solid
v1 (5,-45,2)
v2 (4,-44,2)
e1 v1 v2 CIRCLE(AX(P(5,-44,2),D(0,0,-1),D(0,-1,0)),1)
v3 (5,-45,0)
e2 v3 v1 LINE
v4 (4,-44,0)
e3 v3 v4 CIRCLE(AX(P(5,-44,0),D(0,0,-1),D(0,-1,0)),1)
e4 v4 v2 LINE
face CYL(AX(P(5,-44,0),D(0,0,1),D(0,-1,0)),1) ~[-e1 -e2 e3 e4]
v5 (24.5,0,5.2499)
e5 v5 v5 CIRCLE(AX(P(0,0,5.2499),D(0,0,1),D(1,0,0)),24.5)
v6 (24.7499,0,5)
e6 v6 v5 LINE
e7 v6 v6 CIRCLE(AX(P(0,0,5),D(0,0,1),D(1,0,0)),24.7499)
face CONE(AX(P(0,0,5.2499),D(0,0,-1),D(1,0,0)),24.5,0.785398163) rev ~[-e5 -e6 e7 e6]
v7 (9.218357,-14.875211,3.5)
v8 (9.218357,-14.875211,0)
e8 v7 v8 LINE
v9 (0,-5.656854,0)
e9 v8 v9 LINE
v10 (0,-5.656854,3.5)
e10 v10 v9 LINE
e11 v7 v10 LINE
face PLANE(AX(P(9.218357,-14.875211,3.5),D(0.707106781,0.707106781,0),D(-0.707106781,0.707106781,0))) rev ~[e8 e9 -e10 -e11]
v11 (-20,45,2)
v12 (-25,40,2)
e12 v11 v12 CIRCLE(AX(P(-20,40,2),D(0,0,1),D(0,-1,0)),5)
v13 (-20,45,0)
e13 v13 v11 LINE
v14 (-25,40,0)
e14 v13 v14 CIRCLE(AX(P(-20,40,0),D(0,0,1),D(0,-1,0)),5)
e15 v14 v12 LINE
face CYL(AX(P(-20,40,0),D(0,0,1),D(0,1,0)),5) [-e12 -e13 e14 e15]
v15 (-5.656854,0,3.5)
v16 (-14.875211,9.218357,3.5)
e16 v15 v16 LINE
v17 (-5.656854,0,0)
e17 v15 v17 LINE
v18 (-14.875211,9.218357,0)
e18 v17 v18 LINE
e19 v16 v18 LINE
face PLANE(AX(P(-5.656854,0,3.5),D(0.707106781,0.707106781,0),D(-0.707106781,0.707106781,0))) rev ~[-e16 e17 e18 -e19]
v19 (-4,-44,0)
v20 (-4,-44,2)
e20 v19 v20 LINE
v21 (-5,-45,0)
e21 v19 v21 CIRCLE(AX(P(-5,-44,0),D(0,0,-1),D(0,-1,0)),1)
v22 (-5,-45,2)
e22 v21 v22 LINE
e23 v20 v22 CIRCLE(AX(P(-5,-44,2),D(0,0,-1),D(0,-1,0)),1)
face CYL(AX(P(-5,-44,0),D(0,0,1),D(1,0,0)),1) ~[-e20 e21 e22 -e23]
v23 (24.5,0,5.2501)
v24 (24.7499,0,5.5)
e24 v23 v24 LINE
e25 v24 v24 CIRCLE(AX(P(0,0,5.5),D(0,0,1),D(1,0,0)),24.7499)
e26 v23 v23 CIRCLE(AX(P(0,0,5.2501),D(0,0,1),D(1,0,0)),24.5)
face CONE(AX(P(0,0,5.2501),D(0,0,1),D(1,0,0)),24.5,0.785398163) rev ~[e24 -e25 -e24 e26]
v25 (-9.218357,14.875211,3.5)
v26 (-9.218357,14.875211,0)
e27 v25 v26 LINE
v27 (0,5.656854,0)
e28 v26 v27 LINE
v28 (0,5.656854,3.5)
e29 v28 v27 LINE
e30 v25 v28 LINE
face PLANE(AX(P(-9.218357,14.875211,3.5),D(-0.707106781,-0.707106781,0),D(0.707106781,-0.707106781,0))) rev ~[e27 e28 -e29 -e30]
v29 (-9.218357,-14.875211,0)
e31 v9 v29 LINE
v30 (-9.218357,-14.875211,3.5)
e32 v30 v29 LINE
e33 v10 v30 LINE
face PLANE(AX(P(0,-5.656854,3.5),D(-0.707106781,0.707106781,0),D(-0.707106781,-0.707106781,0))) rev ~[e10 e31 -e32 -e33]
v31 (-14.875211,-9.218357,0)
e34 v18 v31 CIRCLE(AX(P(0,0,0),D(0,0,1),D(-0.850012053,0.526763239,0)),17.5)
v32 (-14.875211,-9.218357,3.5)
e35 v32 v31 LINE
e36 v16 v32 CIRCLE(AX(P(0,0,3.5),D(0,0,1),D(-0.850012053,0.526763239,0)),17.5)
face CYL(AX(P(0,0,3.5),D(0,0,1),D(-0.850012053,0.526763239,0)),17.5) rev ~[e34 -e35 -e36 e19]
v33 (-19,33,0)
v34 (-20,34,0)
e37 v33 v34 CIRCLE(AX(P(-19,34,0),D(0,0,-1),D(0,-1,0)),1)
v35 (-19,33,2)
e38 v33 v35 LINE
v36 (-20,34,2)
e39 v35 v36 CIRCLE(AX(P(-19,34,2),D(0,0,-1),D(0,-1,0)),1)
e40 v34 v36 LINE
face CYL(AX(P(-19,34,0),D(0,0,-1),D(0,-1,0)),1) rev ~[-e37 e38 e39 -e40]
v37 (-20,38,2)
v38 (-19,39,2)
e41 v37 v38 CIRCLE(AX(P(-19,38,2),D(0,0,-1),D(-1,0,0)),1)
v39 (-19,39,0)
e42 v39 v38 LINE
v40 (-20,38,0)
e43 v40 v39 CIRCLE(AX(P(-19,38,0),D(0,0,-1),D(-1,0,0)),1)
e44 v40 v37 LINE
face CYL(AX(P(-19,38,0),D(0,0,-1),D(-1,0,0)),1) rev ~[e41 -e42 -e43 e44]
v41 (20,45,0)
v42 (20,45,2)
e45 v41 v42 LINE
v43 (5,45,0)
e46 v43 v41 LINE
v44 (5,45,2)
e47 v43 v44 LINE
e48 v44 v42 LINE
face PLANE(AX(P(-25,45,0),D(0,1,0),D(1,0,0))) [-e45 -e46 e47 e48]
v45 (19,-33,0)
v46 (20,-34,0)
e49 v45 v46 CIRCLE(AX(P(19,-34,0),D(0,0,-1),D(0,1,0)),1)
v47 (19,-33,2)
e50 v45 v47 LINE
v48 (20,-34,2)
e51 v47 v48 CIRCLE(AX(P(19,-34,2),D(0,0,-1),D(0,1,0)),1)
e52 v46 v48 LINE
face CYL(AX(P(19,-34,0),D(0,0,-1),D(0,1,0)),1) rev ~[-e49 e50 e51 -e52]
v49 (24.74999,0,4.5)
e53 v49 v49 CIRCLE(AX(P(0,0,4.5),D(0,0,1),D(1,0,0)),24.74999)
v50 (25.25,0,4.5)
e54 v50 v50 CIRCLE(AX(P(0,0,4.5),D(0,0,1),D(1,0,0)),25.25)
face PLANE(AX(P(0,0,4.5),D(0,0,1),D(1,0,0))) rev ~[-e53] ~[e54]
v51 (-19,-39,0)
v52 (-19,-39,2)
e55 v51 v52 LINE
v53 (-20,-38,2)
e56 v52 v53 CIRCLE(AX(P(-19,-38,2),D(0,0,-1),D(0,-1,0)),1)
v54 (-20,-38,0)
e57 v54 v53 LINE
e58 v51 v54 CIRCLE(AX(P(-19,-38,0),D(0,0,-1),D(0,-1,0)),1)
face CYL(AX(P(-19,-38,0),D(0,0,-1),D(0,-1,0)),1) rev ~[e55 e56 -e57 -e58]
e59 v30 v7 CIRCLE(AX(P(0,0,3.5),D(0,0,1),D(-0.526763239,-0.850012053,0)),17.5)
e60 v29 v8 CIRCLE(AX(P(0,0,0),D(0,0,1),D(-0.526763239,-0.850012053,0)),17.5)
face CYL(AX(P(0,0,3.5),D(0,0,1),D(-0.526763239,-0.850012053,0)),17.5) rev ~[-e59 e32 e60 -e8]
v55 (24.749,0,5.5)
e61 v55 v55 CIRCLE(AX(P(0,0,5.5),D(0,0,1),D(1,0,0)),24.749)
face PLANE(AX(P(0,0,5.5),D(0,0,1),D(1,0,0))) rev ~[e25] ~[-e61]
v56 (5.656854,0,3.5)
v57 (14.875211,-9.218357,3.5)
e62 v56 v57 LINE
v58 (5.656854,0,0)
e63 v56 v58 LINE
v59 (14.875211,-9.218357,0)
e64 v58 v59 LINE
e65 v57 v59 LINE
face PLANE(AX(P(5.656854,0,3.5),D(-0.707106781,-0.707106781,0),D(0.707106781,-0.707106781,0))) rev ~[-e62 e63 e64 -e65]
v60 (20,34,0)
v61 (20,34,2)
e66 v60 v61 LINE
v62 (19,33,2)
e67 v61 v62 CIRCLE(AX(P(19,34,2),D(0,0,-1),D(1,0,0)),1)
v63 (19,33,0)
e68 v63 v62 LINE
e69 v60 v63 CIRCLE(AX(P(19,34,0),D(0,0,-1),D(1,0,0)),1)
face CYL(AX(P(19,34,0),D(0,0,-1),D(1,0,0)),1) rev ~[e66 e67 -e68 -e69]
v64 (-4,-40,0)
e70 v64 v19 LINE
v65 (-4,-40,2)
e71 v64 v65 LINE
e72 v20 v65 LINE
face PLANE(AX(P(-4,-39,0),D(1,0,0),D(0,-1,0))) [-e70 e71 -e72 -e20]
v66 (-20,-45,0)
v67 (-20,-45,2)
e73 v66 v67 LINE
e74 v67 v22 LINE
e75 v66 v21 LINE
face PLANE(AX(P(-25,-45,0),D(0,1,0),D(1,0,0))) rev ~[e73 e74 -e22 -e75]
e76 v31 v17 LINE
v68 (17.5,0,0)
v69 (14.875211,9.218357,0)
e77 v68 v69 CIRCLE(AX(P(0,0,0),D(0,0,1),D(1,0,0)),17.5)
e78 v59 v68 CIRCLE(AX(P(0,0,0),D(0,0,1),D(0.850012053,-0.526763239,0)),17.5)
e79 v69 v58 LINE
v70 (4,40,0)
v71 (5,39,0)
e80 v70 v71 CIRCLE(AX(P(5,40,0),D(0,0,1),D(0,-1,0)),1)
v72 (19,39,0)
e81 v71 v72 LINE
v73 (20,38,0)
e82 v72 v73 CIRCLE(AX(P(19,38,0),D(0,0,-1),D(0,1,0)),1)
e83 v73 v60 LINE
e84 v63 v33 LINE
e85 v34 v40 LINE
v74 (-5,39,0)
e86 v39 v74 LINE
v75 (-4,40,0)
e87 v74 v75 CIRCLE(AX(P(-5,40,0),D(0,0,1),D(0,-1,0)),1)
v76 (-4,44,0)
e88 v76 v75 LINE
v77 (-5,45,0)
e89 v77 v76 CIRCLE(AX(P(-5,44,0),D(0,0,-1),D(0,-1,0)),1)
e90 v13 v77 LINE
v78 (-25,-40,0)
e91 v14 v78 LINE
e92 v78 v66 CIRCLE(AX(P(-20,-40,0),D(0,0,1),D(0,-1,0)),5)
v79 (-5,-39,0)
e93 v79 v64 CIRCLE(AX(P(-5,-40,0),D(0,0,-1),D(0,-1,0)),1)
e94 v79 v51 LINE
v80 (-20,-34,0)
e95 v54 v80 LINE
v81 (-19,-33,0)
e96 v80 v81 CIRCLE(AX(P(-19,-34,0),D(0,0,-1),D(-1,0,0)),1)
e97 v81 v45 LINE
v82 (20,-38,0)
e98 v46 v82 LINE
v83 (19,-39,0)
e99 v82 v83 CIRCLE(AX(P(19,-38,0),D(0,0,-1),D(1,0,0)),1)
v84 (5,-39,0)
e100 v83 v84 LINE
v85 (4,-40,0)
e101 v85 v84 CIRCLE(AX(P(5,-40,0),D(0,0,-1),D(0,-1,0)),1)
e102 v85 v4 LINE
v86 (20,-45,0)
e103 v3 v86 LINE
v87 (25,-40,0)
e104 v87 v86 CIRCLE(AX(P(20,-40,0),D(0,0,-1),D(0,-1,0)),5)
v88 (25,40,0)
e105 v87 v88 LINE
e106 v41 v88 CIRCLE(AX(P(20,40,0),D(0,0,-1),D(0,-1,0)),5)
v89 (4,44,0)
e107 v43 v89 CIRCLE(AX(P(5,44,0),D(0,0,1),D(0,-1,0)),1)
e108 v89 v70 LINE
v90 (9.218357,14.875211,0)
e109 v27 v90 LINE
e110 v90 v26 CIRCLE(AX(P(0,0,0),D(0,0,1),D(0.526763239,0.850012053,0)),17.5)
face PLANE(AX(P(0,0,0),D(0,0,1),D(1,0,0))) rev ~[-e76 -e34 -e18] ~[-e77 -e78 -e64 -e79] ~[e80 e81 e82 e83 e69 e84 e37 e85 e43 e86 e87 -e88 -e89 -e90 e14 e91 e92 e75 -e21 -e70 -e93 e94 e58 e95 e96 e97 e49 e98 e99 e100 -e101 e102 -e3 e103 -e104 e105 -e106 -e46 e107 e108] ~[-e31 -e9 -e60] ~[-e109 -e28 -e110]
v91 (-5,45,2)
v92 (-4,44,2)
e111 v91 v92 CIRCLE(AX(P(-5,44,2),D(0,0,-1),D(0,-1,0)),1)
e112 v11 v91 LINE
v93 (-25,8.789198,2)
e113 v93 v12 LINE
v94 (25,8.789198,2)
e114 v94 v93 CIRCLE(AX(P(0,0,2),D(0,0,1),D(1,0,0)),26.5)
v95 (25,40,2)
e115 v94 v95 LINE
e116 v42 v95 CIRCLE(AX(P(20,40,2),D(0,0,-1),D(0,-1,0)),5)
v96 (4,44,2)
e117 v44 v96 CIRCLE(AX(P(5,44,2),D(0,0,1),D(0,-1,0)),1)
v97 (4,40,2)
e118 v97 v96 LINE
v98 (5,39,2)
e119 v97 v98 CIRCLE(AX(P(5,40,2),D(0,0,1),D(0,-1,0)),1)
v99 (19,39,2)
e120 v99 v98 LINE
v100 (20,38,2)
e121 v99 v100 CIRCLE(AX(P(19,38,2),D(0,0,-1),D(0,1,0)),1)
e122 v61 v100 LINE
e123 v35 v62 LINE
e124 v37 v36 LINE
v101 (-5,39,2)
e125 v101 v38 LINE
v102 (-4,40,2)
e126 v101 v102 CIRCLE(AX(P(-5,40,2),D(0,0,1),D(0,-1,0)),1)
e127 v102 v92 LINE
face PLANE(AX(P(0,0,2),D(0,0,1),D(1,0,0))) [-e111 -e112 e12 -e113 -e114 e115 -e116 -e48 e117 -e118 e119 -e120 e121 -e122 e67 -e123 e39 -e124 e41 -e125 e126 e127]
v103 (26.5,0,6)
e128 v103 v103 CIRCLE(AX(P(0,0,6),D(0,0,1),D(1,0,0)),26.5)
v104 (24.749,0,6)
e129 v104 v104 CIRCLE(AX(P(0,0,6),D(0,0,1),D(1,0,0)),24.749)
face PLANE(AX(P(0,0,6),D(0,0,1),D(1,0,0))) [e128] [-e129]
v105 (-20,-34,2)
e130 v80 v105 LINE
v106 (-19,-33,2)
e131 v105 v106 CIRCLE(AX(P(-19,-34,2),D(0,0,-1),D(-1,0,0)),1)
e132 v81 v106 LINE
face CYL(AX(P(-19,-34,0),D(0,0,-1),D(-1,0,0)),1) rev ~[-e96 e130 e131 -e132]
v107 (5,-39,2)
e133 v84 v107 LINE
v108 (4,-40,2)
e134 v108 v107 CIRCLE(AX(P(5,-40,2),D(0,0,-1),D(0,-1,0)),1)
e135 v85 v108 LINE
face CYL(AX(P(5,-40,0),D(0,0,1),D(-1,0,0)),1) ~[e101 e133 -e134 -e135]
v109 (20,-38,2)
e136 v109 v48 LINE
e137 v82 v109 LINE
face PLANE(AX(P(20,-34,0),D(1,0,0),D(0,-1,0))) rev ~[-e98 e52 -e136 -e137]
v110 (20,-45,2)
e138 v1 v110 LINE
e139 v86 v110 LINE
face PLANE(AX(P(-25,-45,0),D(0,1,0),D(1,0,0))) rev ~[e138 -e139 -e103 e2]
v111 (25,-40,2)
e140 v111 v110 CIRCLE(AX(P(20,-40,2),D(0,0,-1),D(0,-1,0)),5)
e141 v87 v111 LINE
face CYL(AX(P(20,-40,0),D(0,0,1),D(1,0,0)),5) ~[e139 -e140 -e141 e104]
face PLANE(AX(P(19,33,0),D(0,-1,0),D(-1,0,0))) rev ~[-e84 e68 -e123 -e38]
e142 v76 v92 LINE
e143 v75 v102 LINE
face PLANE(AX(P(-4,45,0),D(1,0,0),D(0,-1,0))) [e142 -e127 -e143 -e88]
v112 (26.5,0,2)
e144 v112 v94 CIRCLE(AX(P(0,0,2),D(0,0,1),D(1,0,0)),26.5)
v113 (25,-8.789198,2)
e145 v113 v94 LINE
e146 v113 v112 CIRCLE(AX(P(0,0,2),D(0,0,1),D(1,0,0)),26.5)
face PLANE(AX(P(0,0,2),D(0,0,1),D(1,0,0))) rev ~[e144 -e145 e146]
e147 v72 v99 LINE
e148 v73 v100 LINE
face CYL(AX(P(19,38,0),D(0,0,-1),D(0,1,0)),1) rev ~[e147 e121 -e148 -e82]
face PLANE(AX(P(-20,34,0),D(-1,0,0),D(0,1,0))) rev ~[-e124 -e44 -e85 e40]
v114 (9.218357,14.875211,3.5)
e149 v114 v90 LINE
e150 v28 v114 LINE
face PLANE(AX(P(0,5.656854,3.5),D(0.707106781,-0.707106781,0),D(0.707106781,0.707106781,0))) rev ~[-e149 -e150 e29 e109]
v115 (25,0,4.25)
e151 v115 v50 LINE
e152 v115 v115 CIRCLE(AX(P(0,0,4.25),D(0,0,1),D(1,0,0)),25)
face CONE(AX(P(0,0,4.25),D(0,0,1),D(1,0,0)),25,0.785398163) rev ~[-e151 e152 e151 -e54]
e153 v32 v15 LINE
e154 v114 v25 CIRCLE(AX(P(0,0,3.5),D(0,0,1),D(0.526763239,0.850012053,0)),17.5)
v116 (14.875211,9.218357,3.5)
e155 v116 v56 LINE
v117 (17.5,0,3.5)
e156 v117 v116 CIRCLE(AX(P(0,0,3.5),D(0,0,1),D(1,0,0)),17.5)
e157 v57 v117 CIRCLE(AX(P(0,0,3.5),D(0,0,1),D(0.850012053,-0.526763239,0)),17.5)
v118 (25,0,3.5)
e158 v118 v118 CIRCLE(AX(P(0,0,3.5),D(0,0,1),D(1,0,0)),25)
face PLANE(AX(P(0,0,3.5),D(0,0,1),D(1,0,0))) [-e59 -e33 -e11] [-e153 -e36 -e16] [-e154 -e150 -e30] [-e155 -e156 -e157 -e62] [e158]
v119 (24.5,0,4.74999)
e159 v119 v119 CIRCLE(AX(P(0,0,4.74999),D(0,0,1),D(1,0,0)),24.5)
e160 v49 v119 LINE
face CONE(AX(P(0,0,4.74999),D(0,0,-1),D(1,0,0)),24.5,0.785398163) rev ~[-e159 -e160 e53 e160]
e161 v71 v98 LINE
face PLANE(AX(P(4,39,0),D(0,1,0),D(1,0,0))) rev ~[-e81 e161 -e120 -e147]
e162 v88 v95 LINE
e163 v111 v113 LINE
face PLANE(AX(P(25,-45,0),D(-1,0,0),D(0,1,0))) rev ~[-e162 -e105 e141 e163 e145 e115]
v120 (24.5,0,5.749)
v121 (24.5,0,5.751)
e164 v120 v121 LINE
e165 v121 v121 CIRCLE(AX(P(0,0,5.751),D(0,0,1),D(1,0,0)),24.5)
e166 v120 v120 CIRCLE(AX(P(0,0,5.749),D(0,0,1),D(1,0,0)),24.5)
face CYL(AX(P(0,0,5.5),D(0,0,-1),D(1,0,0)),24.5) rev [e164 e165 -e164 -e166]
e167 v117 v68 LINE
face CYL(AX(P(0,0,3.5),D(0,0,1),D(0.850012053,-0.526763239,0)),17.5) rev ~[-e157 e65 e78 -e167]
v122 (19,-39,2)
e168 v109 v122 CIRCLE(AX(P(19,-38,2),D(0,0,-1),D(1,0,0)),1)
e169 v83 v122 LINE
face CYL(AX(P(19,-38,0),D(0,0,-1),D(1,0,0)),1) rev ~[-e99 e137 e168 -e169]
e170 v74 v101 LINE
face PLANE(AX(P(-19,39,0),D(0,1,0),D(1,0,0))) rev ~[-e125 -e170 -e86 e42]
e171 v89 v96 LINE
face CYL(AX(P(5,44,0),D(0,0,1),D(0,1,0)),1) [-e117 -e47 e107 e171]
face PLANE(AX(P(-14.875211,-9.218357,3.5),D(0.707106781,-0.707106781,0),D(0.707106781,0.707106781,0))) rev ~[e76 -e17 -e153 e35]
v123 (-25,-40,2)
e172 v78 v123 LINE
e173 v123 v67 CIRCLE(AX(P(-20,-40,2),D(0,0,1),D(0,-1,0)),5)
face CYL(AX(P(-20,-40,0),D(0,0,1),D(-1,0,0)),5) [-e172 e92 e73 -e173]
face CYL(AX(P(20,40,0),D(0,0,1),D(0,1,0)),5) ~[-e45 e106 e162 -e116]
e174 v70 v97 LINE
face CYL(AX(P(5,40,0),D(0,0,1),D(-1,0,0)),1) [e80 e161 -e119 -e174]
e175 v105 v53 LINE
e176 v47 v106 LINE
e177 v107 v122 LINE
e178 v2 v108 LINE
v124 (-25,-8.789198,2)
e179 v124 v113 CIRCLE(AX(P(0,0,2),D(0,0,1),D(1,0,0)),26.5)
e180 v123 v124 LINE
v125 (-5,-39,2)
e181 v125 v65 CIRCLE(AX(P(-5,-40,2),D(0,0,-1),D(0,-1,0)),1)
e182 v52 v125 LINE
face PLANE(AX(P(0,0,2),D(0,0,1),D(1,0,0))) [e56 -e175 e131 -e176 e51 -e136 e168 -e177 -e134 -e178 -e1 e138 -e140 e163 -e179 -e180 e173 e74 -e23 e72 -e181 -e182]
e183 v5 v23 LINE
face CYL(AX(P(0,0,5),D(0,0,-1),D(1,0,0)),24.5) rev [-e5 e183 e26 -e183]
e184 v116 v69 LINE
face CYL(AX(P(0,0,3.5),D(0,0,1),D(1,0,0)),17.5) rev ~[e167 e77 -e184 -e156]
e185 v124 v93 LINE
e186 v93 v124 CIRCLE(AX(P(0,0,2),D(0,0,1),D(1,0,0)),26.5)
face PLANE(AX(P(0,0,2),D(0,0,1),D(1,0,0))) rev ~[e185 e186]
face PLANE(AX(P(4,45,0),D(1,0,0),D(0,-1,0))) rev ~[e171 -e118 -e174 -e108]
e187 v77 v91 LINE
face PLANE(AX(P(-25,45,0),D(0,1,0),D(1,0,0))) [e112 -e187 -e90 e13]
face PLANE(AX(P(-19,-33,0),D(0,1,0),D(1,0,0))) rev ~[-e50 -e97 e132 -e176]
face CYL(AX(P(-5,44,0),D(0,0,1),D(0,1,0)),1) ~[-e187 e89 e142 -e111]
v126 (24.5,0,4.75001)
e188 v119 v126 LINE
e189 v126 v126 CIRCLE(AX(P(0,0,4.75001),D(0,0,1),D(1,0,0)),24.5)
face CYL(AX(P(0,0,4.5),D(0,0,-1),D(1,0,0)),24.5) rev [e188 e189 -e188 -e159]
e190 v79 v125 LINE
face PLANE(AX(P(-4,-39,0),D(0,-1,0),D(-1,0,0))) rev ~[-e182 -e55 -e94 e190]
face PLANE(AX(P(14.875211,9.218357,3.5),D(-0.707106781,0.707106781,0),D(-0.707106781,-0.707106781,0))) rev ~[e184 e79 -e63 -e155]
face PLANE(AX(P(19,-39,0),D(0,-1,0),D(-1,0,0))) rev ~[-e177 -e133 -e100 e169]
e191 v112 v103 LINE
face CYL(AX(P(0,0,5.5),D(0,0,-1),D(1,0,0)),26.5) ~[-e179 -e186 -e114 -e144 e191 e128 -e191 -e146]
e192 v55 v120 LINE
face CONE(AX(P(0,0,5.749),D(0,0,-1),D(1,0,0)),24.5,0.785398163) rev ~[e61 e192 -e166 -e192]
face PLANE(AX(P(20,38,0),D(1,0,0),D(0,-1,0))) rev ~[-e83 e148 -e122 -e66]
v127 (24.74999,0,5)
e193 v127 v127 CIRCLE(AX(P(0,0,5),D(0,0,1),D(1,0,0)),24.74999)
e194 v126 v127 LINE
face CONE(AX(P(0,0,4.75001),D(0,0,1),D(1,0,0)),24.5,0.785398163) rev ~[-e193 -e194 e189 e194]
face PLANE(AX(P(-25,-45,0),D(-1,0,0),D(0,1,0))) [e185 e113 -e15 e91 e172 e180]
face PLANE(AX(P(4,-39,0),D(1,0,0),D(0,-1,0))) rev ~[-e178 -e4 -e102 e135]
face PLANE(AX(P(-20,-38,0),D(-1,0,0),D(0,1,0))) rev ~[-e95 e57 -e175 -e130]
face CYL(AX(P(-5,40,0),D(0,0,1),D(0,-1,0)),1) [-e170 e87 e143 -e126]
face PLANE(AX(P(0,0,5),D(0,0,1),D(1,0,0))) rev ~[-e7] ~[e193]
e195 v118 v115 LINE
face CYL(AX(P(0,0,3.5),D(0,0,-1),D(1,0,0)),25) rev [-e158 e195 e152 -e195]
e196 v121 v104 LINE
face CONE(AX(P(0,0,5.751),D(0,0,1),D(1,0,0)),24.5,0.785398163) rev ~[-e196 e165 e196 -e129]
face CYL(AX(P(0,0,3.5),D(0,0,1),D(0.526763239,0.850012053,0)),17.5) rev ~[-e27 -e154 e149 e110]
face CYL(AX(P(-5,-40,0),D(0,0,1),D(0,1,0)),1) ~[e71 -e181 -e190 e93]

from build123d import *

# Parameters (mm, degrees)
F0_W      = 50
F0_H      = 90
F1_DEPTH  = 2
F2_R      = 26.5
F3_DEPTH  = 1.5
F4_R      = 26.5
F4_R_2    = 25
F5_DEPTH  = 1
F6_W      = 3
F6_H      = 70
F7_DEPTH  = 3
F8_DEPTH  = 3
F10_DEPTH = 25
F11_W     = 8
F11_H     = 6
F12_DEPTH = 25
F13_R     = 1
F14_R     = 1
F15_R     = 5
F18_SIZE  = 0.25
F19_R     = 26.5
F19_R_2   = 25.25
F19_R_3   = 24.5
F20_DEPTH = 0.5
F21_SIZE  = 0.24999
F22_R     = 26.5
F22_R_2   = 24.74999
F22_R_3   = 24.5
F23_DEPTH = 0.5
F24_SIZE  = 0.2499
F25_R     = 26.5
F25_R_2   = 24.7499
F25_R_3   = 24.5
F26_DEPTH = 0.5
F27_SIZE  = 0.249


# Not quite as in the source:
# - a fillet or chamfer is up to 0.001 mm smaller than in the source, because OpenCascade refuses the exact size


with BuildPart() as f1:
    # F0 (on Top) → F1 (new body)
    with BuildSketch(Plane.XY):
        Rectangle(F0_W, F0_H)
    extrude(amount=F1_DEPTH)

    # F2 (on face) → F3 (join)
    with BuildSketch(Plane.XY.offset(2)):
        Circle(F2_R)
    extrude(amount=F3_DEPTH)

    # F4 (on face) → F5 (join)
    with BuildSketch(Plane.XY.offset(3.5)):
        Circle(F4_R)
        Circle(F4_R_2, mode=Mode.SUBTRACT)
    extrude(amount=F5_DEPTH)

    # F6 (on face) → F7 (join)
    with BuildSketch(Plane(origin=(0, 0, 0), x_dir=(1, 0, 0), z_dir=(0, 0, -1))):
        with Locations((-23.5, 0)):
            Rectangle(F6_W, F6_H)
        with Locations((23.5, 0)):
            Rectangle(F6_W, F6_H)
    extrude(amount=F7_DEPTH)

    # F8 (cut, through all): faces of the model
    f8_faces = [f1.faces().sort_by_distance(p)[0] for p in [
        (-23.5, 0, -3),
        (23.5, 0, -3),
        (-23.5, 0, -3),
        (23.5, 0, -3),
    ]]
    extrude(f8_faces, amount=-F8_DEPTH, mode=Mode.SUBTRACT)

    # F9 (on face) → F10 (cut)
    with BuildSketch(Plane.XY.offset(3.5)):
        with BuildLine():
            Line((-5.6568542495, 0), (-14.8752109279, 9.2183566784))
            ThreePointArc((-14.8752109279, 9.2183566784), (-17.5, 0), (-14.8752109279, -9.2183566784))
            Line((-14.8752109279, -9.2183566784), (-5.6568542495, 0))
        make_face()
        with BuildLine():
            ThreePointArc((-9.2183566784, -14.8752109279), (0, -17.5), (9.2183566784, -14.8752109279))
            Line((9.2183566784, -14.8752109279), (0, -5.6568542495))
            Line((0, -5.6568542495), (-9.2183566784, -14.8752109279))
        make_face()
        with BuildLine():
            ThreePointArc((14.8752109279, -9.2183566784), (16.831015882, -4.7923798244), (17.5, 0))
            ThreePointArc((17.5, 0), (16.831015882, 4.7923798244), (14.8752109279, 9.2183566784))
            Line((14.8752109279, 9.2183566784), (5.6568542495, 0))
            Line((5.6568542495, 0), (14.8752109279, -9.2183566784))
        make_face()
        with BuildLine():
            Line((0, 5.6568542495), (9.2183566784, 14.8752109279))
            ThreePointArc((9.2183566784, 14.8752109279), (0, 17.5), (-9.2183566784, 14.8752109279))
            Line((-9.2183566784, 14.8752109279), (0, 5.6568542495))
        make_face()
    extrude(amount=-F10_DEPTH, mode=Mode.SUBTRACT)

    # F11 (on face) → F12 (cut)
    with BuildSketch(Plane(origin=(0, 0, 0), x_dir=(1, 0, 0), z_dir=(0, 0, -1))):
        with Locations((0, -42)):
            Rectangle(F11_W, F11_H)
        with BuildLine():
            Line((-4, -39), (4, -39))
            Line((4, -39), (19, -39))
            ThreePointArc((19, -39), (19.7071067812, -38.7071067812), (20, -38))
            Line((20, -38), (20, -34))
            ThreePointArc((20, -34), (19.7071067812, -33.2928932188), (19, -33))
            Line((19, -33), (-19, -33))
            ThreePointArc((-19, -33), (-19.7071067812, -33.2928932188), (-20, -34))
            Line((-20, -34), (-20, -38))
            ThreePointArc((-20, -38), (-19.7071067812, -38.7071067812), (-19, -39))
            Line((-19, -39), (-4, -39))
        make_face()
        with Locations((0, 42)):
            Rectangle(F11_W, F11_H)
        with BuildLine():
            ThreePointArc((20, 38), (19.7071067812, 38.7071067812), (19, 39))
            Line((19, 39), (4, 39))
            Line((4, 39), (-4, 39))
            Line((-4, 39), (-19, 39))
            ThreePointArc((-19, 39), (-19.7071067812, 38.7071067812), (-20, 38))
            Line((-20, 38), (-20, 34))
            ThreePointArc((-20, 34), (-19.7071067812, 33.2928932188), (-19, 33))
            Line((-19, 33), (19, 33))
            ThreePointArc((19, 33), (19.7071067812, 33.2928932188), (20, 34))
            Line((20, 34), (20, 38))
        make_face()
    extrude(amount=-F12_DEPTH, mode=Mode.SUBTRACT)

    # F13
    f13_edges = [f1.edges().sort_by_distance(p)[0] for p in [
        (-4, -45, 1),
        (-4, -39, 1),
        (4, -45, 1),
        (4, -39, 1),
    ]]
    fillet(f13_edges, radius=F13_R)

    # F14
    f14_edges = [f1.edges().sort_by_distance(p)[0] for p in [
        (4, 45, 1),
        (4, 39, 1),
        (-4, 45, 1),
        (-4, 39, 1),
    ]]
    fillet(f14_edges, radius=F14_R)

    # F15
    f15_edges = [f1.edges().sort_by_distance(p)[0] for p in [
        (25, -45, 1),
        (25, 45, 1),
        (-25, 45, 1),
        (-25, -45, 1),
    ]]
    fillet(f15_edges, radius=F15_R)


with BuildPart() as f16_1:
    # F16: copy of F1
    add(f1.part.moved(Location((72.1, 0, 0))))


with BuildPart() as f1_1:
    add(f1.part)

    # F18
    f18_edges = [f1_1.edges().sort_by_distance(p)[0] for p in [
        (-25, 0, 4.5),
    ]]
    chamfer(f18_edges, length=F18_SIZE)

    # F19 (on face) → F20 (join)
    with BuildSketch(Plane.XY.offset(4.5)):
        Circle(F19_R)
        Circle(F19_R_2, mode=Mode.SUBTRACT)
        Circle(F19_R_2)
        Circle(F19_R_3, mode=Mode.SUBTRACT)
    extrude(amount=F20_DEPTH)

    # F21 (size 0.25 in the source; OpenCascade refuses exactly that, so slightly less here)
    f21_edges = [f1_1.edges().sort_by_distance(p)[0] for p in [
        (-24.5, 0, 4.5),
        (-24.5, 0, 5),
    ]]
    chamfer(f21_edges, length=F21_SIZE)

    # F22 (on face) → F23 (join)
    with BuildSketch(Plane.XY.offset(5)):
        Circle(F22_R)
        Circle(F22_R_2, mode=Mode.SUBTRACT)
        Circle(F22_R_2)
        Circle(F22_R_3, mode=Mode.SUBTRACT)
    extrude(amount=F23_DEPTH)

    # F24 (size 0.25 in the source; OpenCascade refuses exactly that, so slightly less here)
    f24_edges = [f1_1.edges().sort_by_distance(p)[0] for p in [
        (-24.5, 0, 5),
        (-24.5, 0, 5.5),
    ]]
    chamfer(f24_edges, length=F24_SIZE)

    # F25 (on face) → F26 (join)
    with BuildSketch(Plane.XY.offset(5.5)):
        Circle(F25_R)
        Circle(F25_R_2, mode=Mode.SUBTRACT)
        Circle(F25_R_2)
        Circle(F25_R_3, mode=Mode.SUBTRACT)
    extrude(amount=F26_DEPTH)

    # F27 (size 0.25 in the source; OpenCascade refuses exactly that, so slightly less here)
    f27_edges = [f1_1.edges().sort_by_distance(p)[0] for p in [
        (-24.5, 0, 6),
        (-24.5, 0, 5.5),
    ]]
    chamfer(f27_edges, length=F27_SIZE)


solid = f1_1.part
